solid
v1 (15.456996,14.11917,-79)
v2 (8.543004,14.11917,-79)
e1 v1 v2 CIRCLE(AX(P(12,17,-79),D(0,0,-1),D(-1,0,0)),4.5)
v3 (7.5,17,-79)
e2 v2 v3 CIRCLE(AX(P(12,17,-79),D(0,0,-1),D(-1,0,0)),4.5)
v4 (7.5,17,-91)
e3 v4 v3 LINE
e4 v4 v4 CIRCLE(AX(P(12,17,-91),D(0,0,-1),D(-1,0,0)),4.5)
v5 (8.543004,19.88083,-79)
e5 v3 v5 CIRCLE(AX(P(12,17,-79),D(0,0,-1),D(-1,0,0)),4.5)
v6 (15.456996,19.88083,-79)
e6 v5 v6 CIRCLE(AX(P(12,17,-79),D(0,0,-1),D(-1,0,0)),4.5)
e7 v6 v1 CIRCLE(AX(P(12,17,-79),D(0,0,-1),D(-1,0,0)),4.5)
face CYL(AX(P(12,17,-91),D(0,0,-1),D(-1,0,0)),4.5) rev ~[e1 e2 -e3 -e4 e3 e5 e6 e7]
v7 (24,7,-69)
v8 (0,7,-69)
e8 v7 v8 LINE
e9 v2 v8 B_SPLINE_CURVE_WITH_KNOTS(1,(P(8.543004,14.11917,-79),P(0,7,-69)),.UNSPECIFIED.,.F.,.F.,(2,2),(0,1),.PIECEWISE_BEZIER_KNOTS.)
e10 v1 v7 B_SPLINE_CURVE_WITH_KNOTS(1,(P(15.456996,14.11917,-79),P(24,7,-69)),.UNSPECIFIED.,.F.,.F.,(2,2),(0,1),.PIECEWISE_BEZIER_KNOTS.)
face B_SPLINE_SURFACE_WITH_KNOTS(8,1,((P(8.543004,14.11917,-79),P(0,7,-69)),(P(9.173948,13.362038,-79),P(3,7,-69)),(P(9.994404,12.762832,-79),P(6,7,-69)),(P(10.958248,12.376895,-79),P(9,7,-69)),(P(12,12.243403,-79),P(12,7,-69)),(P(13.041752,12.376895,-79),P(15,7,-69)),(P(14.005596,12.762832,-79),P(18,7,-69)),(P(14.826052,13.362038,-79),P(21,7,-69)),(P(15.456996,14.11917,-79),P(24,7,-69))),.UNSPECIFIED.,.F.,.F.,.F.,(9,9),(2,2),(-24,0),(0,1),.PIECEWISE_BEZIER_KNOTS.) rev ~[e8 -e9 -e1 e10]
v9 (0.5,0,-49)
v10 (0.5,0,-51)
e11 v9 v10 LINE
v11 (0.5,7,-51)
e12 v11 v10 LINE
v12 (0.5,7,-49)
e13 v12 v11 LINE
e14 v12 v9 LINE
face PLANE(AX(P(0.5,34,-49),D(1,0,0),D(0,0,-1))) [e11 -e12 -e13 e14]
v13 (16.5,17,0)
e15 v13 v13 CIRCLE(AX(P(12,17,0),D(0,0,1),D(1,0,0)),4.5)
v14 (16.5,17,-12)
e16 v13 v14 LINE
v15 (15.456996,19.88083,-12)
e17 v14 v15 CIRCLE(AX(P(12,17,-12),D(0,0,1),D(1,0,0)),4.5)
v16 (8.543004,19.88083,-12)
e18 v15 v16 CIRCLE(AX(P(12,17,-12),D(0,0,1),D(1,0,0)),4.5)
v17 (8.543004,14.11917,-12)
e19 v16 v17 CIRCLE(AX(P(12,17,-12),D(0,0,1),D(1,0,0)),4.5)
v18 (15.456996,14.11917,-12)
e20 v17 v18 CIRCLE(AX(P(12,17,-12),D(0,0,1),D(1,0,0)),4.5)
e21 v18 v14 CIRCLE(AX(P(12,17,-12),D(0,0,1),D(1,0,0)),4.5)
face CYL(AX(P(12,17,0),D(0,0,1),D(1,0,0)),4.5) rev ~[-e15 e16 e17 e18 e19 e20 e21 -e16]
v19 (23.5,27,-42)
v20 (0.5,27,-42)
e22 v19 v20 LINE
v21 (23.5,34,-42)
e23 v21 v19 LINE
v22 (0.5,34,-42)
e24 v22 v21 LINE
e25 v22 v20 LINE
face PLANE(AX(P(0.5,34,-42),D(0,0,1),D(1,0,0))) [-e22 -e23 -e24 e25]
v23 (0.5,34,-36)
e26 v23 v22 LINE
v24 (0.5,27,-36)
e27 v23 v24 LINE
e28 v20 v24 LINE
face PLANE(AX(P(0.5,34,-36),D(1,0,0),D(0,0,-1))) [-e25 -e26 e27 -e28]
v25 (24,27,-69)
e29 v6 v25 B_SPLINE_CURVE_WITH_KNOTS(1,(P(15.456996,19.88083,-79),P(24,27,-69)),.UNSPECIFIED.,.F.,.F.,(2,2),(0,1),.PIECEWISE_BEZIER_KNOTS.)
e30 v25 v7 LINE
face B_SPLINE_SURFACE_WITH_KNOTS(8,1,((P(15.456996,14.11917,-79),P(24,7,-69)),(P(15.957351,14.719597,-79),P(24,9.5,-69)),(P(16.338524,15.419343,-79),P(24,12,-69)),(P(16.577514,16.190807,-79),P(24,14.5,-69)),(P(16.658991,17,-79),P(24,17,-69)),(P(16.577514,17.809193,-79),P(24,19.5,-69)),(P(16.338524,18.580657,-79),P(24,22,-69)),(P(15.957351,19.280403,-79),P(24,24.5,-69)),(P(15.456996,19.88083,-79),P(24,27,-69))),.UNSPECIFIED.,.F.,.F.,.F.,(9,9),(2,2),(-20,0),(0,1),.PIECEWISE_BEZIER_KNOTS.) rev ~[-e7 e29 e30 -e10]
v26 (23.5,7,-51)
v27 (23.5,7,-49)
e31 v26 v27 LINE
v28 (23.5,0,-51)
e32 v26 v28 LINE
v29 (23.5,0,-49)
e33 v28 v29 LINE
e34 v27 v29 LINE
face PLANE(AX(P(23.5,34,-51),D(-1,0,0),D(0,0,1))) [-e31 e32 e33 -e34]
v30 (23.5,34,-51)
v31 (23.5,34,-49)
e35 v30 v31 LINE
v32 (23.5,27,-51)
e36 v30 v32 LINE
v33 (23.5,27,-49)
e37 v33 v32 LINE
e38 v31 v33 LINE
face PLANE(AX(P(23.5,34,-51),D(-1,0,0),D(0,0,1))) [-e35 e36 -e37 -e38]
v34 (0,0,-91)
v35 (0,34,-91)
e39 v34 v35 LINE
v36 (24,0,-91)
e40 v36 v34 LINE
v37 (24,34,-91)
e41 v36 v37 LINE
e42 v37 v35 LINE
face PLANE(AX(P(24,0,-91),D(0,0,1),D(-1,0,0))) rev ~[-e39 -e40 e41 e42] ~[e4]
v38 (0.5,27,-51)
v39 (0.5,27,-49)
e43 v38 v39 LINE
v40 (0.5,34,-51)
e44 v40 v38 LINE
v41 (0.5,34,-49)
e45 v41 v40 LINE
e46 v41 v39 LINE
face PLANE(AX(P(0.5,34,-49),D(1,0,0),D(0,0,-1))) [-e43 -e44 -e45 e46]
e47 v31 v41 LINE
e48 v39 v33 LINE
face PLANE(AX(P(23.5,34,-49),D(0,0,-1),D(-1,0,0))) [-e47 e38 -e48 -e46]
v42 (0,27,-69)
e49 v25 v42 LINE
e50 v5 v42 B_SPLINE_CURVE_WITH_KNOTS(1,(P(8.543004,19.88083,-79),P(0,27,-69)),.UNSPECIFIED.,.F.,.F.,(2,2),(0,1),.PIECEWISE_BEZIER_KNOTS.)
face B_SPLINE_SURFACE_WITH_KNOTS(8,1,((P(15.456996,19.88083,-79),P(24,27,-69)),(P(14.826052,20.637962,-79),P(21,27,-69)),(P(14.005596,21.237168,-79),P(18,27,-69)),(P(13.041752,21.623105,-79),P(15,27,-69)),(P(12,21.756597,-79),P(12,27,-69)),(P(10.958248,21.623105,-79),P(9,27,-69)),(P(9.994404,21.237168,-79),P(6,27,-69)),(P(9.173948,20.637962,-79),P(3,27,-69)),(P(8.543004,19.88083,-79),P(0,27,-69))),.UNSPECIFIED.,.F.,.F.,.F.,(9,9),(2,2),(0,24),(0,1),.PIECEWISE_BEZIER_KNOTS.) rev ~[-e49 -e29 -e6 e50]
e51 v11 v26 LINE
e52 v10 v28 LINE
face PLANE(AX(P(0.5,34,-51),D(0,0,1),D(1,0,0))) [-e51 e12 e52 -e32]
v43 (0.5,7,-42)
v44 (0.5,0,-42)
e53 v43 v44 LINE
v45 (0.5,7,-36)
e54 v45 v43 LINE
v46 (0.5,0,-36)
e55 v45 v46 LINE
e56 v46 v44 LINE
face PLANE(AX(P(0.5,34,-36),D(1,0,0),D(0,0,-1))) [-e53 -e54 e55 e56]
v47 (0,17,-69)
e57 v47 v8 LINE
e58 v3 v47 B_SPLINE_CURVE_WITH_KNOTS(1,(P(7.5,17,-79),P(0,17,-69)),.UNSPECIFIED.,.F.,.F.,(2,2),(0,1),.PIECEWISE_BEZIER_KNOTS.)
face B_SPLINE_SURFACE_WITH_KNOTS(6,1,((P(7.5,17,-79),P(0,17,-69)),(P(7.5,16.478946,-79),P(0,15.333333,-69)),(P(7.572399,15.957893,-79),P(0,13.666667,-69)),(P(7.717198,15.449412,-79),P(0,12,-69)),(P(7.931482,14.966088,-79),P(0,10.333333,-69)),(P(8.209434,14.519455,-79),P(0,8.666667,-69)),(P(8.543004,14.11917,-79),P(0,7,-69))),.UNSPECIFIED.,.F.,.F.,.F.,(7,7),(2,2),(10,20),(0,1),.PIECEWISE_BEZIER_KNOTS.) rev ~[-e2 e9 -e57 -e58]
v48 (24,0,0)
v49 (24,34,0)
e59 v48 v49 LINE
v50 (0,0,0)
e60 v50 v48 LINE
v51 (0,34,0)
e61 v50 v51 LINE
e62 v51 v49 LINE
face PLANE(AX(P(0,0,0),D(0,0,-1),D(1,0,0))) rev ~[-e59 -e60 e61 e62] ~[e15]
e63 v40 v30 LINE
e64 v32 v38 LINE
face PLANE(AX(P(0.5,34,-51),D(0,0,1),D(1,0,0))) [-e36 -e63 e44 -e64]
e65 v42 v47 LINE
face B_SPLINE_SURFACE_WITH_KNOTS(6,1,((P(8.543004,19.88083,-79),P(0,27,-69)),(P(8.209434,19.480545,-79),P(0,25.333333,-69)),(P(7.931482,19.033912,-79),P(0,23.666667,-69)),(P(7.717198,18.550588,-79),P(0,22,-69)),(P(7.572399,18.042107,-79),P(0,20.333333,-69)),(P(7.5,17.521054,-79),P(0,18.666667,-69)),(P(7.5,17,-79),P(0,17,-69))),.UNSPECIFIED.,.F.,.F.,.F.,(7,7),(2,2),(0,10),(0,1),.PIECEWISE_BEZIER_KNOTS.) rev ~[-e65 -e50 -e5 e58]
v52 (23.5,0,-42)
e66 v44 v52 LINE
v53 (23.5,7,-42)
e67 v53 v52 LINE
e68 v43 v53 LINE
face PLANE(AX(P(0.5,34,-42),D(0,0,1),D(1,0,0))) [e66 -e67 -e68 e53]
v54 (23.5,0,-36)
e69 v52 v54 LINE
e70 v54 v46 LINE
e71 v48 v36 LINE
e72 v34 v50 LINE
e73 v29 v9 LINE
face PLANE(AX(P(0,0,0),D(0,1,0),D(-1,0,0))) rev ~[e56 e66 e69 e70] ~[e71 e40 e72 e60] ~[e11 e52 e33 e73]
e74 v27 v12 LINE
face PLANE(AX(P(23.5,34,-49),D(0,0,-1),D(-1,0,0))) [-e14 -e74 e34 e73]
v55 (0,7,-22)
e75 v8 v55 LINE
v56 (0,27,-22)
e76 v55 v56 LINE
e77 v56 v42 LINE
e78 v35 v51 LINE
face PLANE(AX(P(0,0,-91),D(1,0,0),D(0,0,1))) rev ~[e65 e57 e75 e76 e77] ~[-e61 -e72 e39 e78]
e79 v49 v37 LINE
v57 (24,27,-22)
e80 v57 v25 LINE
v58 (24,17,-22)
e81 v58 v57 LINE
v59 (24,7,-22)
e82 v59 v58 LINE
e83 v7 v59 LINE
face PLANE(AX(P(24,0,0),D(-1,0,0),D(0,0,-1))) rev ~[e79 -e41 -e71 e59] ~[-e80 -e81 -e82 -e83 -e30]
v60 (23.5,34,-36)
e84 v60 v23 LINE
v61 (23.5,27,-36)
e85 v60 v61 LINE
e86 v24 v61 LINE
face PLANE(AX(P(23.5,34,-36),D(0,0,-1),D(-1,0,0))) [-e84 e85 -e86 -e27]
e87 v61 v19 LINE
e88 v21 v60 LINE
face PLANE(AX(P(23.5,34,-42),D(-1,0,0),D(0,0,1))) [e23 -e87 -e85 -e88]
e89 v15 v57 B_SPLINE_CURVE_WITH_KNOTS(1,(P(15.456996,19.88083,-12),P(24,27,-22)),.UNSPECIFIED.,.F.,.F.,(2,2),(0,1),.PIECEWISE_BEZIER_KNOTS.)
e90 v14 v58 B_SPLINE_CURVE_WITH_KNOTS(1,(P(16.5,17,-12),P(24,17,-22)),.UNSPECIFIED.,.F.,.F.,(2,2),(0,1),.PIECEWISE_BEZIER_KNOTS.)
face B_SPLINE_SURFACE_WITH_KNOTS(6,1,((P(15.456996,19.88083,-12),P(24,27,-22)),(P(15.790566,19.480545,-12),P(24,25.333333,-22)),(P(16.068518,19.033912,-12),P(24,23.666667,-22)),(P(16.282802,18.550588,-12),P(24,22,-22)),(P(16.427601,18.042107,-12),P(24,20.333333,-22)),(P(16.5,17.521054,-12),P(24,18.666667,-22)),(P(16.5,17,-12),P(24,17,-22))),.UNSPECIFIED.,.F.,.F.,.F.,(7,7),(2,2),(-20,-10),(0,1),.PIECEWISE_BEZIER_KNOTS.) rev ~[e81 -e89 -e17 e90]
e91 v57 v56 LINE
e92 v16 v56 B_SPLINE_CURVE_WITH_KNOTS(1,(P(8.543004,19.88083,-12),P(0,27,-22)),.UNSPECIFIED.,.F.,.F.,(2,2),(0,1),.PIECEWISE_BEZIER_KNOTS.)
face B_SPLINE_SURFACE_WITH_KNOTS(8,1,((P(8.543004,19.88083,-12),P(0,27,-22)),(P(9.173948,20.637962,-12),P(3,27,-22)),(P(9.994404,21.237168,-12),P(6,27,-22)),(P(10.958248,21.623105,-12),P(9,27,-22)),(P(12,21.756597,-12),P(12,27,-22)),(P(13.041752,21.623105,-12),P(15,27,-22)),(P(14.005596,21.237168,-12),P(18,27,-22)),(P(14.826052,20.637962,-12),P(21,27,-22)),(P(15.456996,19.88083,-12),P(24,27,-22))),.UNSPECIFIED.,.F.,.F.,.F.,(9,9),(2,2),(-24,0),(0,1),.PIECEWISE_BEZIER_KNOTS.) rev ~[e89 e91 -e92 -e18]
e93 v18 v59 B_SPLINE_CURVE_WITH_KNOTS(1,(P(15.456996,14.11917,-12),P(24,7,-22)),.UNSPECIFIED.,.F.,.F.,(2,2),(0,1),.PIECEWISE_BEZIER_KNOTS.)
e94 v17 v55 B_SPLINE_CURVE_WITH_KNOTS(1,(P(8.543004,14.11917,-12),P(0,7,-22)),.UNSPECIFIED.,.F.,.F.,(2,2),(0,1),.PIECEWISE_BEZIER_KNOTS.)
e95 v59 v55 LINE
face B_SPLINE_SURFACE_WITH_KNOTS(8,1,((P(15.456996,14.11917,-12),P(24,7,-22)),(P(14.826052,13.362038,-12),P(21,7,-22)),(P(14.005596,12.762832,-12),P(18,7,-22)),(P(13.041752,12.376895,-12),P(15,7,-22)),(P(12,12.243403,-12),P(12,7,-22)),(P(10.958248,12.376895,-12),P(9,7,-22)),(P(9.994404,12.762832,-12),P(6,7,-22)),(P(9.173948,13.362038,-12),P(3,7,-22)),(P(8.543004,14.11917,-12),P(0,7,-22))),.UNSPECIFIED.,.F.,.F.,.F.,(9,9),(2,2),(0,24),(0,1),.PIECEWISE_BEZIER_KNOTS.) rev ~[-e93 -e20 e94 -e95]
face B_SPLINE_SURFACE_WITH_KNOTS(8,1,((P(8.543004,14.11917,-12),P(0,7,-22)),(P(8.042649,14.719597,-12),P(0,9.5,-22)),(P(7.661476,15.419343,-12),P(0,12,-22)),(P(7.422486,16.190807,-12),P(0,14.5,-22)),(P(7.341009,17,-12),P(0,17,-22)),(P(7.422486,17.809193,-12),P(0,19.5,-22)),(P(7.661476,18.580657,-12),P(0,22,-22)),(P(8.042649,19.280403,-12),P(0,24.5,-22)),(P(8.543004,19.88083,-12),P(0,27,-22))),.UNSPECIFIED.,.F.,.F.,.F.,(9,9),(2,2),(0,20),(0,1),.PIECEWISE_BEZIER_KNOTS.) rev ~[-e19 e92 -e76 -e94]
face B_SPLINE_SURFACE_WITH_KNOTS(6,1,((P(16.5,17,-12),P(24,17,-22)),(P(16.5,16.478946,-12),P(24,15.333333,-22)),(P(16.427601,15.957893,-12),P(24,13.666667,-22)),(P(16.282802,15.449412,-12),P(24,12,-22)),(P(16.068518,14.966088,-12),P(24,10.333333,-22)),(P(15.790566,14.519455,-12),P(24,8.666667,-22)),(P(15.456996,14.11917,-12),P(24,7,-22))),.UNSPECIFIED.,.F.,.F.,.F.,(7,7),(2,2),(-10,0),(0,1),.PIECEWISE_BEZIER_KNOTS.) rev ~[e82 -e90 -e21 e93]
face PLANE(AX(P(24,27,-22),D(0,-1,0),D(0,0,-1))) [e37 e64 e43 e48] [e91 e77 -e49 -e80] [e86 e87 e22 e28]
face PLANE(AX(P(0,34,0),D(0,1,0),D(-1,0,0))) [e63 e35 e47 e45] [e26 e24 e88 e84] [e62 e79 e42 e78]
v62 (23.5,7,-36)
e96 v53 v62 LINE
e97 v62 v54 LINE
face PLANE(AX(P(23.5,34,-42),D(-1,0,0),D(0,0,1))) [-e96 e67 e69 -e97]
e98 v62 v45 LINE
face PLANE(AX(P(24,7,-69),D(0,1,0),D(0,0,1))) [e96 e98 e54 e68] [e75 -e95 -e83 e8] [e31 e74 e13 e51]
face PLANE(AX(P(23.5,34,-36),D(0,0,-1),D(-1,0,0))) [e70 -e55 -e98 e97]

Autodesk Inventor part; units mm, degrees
ref_plane "YZ Plane" through (0, 0, 0) normal (1, 0, 0) x (0, 1, 0)
ref_plane "XZ Plane" through (0, 0, 0) normal (0, 1, 0) x (-1, 0, 0)
ref_plane "XY Plane" through (0, 0, 0) normal (0, 0, 1) x (1, 0, 0)
sketch "Sketch1" plane through (0, 0, 0) normal (0, 1, 0) x (-1, 0, 0)
  line L0 (0, 0) -> (-24, 0)
  line L1 (-24, 0) -> (-24, -91)
  line L2 (-24, -91) -> (0, -91)
  line L3 (0, -91) -> (0, 0)
  dimension "d0" = 91
  dimension "d1" = 24
extrude "Extrusion1" add sketch "Sketch1" along normal blind 34
sketch "Sketch2" plane through (24, 0, 0) normal (1, 0, 0) x (0, 0, -1)
  line L0 (22, 27) -> (69, 27)
  line L1 (69, 27) -> (69, 7)
  line L2 (69, 7) -> (22, 7)
  line L3 (22, 7) -> (22, 27)
  line L4 (0, 34) -> (91, 34) projected
  line L5 (0, 0) -> (91, 0) projected
  line L6 (0, 0) -> (0, 34) projected
  line L7 (91, 0) -> (91, 34) projected
  dimension "d4" = 7
  dimension "d5" = 7
  dimension "d6" = 22
  dimension "d7" = 22
extrude "Extrusion2" cut sketch "Sketch2" against normal up to surface (24 mm away) contours L0 L1 L2 L3
sketch "Sketch3" plane through (0, 34, 0) normal (0, 1, 0) x (1, 0, 0)
  line L0 (0.5, 42) -> (23.5, 42)
  line L1 (23.5, 42) -> (23.5, 36)
  line L2 (23.5, 36) -> (0.5, 36)
  line L3 (0.5, 36) -> (0.5, 42)
  line L4 (0, 91) -> (0, 0) projected
  line L5 (24, 0) -> (24, 91) projected
  line L6 (0, 0) -> (24, 0) projected
  dimension "d10" = 0.5
  dimension "d11" = 0.5
  dimension "d12" = 6
  dimension "d13" = 36
extrude "Extrusion3" cut sketch "Sketch3" against normal up to surface (34 mm away)
sketch "Sketch4" plane through (0, 34, 0) normal (0, 1, 0) x (1, 0, 0)
  line L0 (0.5, 51) -> (23.5, 51)
  line L1 (23.5, 51) -> (23.5, 49)
  line L2 (23.5, 49) -> (0.5, 49)
  line L3 (0.5, 49) -> (0.5, 51)
  line L4 (0.5, 42) -> (23.5, 42) projected
  line L5 (24, 0) -> (24, 91) projected
  line L6 (0, 91) -> (0, 0) projected
  dimension "d16" = 2
  dimension "d17" = 7
  dimension "d18" = 0.5
  dimension "d19" = 0.5
extrude "Extrusion4" cut sketch "Sketch4" against normal up to surface (34 mm away)
sketch "Sketch5" plane through (0, 0, 0) normal (0, 0, 1) x (1, 0, 0)
  circle A0 centre (12, 17) radius 4.5
  line L0 (0, 0) -> (24, 0) projected
  line L1 (24, 0) -> (24, 34) projected
  dimension "d22" = 17
  dimension "d23" = 12
  dimension "d24" = 9
extrude "Extrusion5" cut sketch "Sketch5" against normal blind 12
loft "Loft1" cut section 1 edges at (7.5, 17, -12) section 2 edges at (0, 17, -22) (12, 27, -22) (24, 17, -22) (12, 7, -22)
sketch "Sketch6" plane through (24, 0, -91) normal (0, 0, -1) x (-1, 0, 0)
  circle A0 centre (12, 17) radius 4.5
  line L0 (24, 0) -> (24, 34) projected
  line L1 (0, 0) -> (24, 0) projected
  dimension "d31" = 12
  dimension "d32" = 17
  dimension "d33" = 9
extrude "Extrusion6" cut sketch "Sketch6" against normal blind 12
loft "Loft2" cut section 1 edges at (16.5, 17, -79) section 2 edges at (0, 17, -69) (12, 7, -69) (24, 17, -69) (12, 27, -69)
properties part number "20220727_1cell_PBME"
